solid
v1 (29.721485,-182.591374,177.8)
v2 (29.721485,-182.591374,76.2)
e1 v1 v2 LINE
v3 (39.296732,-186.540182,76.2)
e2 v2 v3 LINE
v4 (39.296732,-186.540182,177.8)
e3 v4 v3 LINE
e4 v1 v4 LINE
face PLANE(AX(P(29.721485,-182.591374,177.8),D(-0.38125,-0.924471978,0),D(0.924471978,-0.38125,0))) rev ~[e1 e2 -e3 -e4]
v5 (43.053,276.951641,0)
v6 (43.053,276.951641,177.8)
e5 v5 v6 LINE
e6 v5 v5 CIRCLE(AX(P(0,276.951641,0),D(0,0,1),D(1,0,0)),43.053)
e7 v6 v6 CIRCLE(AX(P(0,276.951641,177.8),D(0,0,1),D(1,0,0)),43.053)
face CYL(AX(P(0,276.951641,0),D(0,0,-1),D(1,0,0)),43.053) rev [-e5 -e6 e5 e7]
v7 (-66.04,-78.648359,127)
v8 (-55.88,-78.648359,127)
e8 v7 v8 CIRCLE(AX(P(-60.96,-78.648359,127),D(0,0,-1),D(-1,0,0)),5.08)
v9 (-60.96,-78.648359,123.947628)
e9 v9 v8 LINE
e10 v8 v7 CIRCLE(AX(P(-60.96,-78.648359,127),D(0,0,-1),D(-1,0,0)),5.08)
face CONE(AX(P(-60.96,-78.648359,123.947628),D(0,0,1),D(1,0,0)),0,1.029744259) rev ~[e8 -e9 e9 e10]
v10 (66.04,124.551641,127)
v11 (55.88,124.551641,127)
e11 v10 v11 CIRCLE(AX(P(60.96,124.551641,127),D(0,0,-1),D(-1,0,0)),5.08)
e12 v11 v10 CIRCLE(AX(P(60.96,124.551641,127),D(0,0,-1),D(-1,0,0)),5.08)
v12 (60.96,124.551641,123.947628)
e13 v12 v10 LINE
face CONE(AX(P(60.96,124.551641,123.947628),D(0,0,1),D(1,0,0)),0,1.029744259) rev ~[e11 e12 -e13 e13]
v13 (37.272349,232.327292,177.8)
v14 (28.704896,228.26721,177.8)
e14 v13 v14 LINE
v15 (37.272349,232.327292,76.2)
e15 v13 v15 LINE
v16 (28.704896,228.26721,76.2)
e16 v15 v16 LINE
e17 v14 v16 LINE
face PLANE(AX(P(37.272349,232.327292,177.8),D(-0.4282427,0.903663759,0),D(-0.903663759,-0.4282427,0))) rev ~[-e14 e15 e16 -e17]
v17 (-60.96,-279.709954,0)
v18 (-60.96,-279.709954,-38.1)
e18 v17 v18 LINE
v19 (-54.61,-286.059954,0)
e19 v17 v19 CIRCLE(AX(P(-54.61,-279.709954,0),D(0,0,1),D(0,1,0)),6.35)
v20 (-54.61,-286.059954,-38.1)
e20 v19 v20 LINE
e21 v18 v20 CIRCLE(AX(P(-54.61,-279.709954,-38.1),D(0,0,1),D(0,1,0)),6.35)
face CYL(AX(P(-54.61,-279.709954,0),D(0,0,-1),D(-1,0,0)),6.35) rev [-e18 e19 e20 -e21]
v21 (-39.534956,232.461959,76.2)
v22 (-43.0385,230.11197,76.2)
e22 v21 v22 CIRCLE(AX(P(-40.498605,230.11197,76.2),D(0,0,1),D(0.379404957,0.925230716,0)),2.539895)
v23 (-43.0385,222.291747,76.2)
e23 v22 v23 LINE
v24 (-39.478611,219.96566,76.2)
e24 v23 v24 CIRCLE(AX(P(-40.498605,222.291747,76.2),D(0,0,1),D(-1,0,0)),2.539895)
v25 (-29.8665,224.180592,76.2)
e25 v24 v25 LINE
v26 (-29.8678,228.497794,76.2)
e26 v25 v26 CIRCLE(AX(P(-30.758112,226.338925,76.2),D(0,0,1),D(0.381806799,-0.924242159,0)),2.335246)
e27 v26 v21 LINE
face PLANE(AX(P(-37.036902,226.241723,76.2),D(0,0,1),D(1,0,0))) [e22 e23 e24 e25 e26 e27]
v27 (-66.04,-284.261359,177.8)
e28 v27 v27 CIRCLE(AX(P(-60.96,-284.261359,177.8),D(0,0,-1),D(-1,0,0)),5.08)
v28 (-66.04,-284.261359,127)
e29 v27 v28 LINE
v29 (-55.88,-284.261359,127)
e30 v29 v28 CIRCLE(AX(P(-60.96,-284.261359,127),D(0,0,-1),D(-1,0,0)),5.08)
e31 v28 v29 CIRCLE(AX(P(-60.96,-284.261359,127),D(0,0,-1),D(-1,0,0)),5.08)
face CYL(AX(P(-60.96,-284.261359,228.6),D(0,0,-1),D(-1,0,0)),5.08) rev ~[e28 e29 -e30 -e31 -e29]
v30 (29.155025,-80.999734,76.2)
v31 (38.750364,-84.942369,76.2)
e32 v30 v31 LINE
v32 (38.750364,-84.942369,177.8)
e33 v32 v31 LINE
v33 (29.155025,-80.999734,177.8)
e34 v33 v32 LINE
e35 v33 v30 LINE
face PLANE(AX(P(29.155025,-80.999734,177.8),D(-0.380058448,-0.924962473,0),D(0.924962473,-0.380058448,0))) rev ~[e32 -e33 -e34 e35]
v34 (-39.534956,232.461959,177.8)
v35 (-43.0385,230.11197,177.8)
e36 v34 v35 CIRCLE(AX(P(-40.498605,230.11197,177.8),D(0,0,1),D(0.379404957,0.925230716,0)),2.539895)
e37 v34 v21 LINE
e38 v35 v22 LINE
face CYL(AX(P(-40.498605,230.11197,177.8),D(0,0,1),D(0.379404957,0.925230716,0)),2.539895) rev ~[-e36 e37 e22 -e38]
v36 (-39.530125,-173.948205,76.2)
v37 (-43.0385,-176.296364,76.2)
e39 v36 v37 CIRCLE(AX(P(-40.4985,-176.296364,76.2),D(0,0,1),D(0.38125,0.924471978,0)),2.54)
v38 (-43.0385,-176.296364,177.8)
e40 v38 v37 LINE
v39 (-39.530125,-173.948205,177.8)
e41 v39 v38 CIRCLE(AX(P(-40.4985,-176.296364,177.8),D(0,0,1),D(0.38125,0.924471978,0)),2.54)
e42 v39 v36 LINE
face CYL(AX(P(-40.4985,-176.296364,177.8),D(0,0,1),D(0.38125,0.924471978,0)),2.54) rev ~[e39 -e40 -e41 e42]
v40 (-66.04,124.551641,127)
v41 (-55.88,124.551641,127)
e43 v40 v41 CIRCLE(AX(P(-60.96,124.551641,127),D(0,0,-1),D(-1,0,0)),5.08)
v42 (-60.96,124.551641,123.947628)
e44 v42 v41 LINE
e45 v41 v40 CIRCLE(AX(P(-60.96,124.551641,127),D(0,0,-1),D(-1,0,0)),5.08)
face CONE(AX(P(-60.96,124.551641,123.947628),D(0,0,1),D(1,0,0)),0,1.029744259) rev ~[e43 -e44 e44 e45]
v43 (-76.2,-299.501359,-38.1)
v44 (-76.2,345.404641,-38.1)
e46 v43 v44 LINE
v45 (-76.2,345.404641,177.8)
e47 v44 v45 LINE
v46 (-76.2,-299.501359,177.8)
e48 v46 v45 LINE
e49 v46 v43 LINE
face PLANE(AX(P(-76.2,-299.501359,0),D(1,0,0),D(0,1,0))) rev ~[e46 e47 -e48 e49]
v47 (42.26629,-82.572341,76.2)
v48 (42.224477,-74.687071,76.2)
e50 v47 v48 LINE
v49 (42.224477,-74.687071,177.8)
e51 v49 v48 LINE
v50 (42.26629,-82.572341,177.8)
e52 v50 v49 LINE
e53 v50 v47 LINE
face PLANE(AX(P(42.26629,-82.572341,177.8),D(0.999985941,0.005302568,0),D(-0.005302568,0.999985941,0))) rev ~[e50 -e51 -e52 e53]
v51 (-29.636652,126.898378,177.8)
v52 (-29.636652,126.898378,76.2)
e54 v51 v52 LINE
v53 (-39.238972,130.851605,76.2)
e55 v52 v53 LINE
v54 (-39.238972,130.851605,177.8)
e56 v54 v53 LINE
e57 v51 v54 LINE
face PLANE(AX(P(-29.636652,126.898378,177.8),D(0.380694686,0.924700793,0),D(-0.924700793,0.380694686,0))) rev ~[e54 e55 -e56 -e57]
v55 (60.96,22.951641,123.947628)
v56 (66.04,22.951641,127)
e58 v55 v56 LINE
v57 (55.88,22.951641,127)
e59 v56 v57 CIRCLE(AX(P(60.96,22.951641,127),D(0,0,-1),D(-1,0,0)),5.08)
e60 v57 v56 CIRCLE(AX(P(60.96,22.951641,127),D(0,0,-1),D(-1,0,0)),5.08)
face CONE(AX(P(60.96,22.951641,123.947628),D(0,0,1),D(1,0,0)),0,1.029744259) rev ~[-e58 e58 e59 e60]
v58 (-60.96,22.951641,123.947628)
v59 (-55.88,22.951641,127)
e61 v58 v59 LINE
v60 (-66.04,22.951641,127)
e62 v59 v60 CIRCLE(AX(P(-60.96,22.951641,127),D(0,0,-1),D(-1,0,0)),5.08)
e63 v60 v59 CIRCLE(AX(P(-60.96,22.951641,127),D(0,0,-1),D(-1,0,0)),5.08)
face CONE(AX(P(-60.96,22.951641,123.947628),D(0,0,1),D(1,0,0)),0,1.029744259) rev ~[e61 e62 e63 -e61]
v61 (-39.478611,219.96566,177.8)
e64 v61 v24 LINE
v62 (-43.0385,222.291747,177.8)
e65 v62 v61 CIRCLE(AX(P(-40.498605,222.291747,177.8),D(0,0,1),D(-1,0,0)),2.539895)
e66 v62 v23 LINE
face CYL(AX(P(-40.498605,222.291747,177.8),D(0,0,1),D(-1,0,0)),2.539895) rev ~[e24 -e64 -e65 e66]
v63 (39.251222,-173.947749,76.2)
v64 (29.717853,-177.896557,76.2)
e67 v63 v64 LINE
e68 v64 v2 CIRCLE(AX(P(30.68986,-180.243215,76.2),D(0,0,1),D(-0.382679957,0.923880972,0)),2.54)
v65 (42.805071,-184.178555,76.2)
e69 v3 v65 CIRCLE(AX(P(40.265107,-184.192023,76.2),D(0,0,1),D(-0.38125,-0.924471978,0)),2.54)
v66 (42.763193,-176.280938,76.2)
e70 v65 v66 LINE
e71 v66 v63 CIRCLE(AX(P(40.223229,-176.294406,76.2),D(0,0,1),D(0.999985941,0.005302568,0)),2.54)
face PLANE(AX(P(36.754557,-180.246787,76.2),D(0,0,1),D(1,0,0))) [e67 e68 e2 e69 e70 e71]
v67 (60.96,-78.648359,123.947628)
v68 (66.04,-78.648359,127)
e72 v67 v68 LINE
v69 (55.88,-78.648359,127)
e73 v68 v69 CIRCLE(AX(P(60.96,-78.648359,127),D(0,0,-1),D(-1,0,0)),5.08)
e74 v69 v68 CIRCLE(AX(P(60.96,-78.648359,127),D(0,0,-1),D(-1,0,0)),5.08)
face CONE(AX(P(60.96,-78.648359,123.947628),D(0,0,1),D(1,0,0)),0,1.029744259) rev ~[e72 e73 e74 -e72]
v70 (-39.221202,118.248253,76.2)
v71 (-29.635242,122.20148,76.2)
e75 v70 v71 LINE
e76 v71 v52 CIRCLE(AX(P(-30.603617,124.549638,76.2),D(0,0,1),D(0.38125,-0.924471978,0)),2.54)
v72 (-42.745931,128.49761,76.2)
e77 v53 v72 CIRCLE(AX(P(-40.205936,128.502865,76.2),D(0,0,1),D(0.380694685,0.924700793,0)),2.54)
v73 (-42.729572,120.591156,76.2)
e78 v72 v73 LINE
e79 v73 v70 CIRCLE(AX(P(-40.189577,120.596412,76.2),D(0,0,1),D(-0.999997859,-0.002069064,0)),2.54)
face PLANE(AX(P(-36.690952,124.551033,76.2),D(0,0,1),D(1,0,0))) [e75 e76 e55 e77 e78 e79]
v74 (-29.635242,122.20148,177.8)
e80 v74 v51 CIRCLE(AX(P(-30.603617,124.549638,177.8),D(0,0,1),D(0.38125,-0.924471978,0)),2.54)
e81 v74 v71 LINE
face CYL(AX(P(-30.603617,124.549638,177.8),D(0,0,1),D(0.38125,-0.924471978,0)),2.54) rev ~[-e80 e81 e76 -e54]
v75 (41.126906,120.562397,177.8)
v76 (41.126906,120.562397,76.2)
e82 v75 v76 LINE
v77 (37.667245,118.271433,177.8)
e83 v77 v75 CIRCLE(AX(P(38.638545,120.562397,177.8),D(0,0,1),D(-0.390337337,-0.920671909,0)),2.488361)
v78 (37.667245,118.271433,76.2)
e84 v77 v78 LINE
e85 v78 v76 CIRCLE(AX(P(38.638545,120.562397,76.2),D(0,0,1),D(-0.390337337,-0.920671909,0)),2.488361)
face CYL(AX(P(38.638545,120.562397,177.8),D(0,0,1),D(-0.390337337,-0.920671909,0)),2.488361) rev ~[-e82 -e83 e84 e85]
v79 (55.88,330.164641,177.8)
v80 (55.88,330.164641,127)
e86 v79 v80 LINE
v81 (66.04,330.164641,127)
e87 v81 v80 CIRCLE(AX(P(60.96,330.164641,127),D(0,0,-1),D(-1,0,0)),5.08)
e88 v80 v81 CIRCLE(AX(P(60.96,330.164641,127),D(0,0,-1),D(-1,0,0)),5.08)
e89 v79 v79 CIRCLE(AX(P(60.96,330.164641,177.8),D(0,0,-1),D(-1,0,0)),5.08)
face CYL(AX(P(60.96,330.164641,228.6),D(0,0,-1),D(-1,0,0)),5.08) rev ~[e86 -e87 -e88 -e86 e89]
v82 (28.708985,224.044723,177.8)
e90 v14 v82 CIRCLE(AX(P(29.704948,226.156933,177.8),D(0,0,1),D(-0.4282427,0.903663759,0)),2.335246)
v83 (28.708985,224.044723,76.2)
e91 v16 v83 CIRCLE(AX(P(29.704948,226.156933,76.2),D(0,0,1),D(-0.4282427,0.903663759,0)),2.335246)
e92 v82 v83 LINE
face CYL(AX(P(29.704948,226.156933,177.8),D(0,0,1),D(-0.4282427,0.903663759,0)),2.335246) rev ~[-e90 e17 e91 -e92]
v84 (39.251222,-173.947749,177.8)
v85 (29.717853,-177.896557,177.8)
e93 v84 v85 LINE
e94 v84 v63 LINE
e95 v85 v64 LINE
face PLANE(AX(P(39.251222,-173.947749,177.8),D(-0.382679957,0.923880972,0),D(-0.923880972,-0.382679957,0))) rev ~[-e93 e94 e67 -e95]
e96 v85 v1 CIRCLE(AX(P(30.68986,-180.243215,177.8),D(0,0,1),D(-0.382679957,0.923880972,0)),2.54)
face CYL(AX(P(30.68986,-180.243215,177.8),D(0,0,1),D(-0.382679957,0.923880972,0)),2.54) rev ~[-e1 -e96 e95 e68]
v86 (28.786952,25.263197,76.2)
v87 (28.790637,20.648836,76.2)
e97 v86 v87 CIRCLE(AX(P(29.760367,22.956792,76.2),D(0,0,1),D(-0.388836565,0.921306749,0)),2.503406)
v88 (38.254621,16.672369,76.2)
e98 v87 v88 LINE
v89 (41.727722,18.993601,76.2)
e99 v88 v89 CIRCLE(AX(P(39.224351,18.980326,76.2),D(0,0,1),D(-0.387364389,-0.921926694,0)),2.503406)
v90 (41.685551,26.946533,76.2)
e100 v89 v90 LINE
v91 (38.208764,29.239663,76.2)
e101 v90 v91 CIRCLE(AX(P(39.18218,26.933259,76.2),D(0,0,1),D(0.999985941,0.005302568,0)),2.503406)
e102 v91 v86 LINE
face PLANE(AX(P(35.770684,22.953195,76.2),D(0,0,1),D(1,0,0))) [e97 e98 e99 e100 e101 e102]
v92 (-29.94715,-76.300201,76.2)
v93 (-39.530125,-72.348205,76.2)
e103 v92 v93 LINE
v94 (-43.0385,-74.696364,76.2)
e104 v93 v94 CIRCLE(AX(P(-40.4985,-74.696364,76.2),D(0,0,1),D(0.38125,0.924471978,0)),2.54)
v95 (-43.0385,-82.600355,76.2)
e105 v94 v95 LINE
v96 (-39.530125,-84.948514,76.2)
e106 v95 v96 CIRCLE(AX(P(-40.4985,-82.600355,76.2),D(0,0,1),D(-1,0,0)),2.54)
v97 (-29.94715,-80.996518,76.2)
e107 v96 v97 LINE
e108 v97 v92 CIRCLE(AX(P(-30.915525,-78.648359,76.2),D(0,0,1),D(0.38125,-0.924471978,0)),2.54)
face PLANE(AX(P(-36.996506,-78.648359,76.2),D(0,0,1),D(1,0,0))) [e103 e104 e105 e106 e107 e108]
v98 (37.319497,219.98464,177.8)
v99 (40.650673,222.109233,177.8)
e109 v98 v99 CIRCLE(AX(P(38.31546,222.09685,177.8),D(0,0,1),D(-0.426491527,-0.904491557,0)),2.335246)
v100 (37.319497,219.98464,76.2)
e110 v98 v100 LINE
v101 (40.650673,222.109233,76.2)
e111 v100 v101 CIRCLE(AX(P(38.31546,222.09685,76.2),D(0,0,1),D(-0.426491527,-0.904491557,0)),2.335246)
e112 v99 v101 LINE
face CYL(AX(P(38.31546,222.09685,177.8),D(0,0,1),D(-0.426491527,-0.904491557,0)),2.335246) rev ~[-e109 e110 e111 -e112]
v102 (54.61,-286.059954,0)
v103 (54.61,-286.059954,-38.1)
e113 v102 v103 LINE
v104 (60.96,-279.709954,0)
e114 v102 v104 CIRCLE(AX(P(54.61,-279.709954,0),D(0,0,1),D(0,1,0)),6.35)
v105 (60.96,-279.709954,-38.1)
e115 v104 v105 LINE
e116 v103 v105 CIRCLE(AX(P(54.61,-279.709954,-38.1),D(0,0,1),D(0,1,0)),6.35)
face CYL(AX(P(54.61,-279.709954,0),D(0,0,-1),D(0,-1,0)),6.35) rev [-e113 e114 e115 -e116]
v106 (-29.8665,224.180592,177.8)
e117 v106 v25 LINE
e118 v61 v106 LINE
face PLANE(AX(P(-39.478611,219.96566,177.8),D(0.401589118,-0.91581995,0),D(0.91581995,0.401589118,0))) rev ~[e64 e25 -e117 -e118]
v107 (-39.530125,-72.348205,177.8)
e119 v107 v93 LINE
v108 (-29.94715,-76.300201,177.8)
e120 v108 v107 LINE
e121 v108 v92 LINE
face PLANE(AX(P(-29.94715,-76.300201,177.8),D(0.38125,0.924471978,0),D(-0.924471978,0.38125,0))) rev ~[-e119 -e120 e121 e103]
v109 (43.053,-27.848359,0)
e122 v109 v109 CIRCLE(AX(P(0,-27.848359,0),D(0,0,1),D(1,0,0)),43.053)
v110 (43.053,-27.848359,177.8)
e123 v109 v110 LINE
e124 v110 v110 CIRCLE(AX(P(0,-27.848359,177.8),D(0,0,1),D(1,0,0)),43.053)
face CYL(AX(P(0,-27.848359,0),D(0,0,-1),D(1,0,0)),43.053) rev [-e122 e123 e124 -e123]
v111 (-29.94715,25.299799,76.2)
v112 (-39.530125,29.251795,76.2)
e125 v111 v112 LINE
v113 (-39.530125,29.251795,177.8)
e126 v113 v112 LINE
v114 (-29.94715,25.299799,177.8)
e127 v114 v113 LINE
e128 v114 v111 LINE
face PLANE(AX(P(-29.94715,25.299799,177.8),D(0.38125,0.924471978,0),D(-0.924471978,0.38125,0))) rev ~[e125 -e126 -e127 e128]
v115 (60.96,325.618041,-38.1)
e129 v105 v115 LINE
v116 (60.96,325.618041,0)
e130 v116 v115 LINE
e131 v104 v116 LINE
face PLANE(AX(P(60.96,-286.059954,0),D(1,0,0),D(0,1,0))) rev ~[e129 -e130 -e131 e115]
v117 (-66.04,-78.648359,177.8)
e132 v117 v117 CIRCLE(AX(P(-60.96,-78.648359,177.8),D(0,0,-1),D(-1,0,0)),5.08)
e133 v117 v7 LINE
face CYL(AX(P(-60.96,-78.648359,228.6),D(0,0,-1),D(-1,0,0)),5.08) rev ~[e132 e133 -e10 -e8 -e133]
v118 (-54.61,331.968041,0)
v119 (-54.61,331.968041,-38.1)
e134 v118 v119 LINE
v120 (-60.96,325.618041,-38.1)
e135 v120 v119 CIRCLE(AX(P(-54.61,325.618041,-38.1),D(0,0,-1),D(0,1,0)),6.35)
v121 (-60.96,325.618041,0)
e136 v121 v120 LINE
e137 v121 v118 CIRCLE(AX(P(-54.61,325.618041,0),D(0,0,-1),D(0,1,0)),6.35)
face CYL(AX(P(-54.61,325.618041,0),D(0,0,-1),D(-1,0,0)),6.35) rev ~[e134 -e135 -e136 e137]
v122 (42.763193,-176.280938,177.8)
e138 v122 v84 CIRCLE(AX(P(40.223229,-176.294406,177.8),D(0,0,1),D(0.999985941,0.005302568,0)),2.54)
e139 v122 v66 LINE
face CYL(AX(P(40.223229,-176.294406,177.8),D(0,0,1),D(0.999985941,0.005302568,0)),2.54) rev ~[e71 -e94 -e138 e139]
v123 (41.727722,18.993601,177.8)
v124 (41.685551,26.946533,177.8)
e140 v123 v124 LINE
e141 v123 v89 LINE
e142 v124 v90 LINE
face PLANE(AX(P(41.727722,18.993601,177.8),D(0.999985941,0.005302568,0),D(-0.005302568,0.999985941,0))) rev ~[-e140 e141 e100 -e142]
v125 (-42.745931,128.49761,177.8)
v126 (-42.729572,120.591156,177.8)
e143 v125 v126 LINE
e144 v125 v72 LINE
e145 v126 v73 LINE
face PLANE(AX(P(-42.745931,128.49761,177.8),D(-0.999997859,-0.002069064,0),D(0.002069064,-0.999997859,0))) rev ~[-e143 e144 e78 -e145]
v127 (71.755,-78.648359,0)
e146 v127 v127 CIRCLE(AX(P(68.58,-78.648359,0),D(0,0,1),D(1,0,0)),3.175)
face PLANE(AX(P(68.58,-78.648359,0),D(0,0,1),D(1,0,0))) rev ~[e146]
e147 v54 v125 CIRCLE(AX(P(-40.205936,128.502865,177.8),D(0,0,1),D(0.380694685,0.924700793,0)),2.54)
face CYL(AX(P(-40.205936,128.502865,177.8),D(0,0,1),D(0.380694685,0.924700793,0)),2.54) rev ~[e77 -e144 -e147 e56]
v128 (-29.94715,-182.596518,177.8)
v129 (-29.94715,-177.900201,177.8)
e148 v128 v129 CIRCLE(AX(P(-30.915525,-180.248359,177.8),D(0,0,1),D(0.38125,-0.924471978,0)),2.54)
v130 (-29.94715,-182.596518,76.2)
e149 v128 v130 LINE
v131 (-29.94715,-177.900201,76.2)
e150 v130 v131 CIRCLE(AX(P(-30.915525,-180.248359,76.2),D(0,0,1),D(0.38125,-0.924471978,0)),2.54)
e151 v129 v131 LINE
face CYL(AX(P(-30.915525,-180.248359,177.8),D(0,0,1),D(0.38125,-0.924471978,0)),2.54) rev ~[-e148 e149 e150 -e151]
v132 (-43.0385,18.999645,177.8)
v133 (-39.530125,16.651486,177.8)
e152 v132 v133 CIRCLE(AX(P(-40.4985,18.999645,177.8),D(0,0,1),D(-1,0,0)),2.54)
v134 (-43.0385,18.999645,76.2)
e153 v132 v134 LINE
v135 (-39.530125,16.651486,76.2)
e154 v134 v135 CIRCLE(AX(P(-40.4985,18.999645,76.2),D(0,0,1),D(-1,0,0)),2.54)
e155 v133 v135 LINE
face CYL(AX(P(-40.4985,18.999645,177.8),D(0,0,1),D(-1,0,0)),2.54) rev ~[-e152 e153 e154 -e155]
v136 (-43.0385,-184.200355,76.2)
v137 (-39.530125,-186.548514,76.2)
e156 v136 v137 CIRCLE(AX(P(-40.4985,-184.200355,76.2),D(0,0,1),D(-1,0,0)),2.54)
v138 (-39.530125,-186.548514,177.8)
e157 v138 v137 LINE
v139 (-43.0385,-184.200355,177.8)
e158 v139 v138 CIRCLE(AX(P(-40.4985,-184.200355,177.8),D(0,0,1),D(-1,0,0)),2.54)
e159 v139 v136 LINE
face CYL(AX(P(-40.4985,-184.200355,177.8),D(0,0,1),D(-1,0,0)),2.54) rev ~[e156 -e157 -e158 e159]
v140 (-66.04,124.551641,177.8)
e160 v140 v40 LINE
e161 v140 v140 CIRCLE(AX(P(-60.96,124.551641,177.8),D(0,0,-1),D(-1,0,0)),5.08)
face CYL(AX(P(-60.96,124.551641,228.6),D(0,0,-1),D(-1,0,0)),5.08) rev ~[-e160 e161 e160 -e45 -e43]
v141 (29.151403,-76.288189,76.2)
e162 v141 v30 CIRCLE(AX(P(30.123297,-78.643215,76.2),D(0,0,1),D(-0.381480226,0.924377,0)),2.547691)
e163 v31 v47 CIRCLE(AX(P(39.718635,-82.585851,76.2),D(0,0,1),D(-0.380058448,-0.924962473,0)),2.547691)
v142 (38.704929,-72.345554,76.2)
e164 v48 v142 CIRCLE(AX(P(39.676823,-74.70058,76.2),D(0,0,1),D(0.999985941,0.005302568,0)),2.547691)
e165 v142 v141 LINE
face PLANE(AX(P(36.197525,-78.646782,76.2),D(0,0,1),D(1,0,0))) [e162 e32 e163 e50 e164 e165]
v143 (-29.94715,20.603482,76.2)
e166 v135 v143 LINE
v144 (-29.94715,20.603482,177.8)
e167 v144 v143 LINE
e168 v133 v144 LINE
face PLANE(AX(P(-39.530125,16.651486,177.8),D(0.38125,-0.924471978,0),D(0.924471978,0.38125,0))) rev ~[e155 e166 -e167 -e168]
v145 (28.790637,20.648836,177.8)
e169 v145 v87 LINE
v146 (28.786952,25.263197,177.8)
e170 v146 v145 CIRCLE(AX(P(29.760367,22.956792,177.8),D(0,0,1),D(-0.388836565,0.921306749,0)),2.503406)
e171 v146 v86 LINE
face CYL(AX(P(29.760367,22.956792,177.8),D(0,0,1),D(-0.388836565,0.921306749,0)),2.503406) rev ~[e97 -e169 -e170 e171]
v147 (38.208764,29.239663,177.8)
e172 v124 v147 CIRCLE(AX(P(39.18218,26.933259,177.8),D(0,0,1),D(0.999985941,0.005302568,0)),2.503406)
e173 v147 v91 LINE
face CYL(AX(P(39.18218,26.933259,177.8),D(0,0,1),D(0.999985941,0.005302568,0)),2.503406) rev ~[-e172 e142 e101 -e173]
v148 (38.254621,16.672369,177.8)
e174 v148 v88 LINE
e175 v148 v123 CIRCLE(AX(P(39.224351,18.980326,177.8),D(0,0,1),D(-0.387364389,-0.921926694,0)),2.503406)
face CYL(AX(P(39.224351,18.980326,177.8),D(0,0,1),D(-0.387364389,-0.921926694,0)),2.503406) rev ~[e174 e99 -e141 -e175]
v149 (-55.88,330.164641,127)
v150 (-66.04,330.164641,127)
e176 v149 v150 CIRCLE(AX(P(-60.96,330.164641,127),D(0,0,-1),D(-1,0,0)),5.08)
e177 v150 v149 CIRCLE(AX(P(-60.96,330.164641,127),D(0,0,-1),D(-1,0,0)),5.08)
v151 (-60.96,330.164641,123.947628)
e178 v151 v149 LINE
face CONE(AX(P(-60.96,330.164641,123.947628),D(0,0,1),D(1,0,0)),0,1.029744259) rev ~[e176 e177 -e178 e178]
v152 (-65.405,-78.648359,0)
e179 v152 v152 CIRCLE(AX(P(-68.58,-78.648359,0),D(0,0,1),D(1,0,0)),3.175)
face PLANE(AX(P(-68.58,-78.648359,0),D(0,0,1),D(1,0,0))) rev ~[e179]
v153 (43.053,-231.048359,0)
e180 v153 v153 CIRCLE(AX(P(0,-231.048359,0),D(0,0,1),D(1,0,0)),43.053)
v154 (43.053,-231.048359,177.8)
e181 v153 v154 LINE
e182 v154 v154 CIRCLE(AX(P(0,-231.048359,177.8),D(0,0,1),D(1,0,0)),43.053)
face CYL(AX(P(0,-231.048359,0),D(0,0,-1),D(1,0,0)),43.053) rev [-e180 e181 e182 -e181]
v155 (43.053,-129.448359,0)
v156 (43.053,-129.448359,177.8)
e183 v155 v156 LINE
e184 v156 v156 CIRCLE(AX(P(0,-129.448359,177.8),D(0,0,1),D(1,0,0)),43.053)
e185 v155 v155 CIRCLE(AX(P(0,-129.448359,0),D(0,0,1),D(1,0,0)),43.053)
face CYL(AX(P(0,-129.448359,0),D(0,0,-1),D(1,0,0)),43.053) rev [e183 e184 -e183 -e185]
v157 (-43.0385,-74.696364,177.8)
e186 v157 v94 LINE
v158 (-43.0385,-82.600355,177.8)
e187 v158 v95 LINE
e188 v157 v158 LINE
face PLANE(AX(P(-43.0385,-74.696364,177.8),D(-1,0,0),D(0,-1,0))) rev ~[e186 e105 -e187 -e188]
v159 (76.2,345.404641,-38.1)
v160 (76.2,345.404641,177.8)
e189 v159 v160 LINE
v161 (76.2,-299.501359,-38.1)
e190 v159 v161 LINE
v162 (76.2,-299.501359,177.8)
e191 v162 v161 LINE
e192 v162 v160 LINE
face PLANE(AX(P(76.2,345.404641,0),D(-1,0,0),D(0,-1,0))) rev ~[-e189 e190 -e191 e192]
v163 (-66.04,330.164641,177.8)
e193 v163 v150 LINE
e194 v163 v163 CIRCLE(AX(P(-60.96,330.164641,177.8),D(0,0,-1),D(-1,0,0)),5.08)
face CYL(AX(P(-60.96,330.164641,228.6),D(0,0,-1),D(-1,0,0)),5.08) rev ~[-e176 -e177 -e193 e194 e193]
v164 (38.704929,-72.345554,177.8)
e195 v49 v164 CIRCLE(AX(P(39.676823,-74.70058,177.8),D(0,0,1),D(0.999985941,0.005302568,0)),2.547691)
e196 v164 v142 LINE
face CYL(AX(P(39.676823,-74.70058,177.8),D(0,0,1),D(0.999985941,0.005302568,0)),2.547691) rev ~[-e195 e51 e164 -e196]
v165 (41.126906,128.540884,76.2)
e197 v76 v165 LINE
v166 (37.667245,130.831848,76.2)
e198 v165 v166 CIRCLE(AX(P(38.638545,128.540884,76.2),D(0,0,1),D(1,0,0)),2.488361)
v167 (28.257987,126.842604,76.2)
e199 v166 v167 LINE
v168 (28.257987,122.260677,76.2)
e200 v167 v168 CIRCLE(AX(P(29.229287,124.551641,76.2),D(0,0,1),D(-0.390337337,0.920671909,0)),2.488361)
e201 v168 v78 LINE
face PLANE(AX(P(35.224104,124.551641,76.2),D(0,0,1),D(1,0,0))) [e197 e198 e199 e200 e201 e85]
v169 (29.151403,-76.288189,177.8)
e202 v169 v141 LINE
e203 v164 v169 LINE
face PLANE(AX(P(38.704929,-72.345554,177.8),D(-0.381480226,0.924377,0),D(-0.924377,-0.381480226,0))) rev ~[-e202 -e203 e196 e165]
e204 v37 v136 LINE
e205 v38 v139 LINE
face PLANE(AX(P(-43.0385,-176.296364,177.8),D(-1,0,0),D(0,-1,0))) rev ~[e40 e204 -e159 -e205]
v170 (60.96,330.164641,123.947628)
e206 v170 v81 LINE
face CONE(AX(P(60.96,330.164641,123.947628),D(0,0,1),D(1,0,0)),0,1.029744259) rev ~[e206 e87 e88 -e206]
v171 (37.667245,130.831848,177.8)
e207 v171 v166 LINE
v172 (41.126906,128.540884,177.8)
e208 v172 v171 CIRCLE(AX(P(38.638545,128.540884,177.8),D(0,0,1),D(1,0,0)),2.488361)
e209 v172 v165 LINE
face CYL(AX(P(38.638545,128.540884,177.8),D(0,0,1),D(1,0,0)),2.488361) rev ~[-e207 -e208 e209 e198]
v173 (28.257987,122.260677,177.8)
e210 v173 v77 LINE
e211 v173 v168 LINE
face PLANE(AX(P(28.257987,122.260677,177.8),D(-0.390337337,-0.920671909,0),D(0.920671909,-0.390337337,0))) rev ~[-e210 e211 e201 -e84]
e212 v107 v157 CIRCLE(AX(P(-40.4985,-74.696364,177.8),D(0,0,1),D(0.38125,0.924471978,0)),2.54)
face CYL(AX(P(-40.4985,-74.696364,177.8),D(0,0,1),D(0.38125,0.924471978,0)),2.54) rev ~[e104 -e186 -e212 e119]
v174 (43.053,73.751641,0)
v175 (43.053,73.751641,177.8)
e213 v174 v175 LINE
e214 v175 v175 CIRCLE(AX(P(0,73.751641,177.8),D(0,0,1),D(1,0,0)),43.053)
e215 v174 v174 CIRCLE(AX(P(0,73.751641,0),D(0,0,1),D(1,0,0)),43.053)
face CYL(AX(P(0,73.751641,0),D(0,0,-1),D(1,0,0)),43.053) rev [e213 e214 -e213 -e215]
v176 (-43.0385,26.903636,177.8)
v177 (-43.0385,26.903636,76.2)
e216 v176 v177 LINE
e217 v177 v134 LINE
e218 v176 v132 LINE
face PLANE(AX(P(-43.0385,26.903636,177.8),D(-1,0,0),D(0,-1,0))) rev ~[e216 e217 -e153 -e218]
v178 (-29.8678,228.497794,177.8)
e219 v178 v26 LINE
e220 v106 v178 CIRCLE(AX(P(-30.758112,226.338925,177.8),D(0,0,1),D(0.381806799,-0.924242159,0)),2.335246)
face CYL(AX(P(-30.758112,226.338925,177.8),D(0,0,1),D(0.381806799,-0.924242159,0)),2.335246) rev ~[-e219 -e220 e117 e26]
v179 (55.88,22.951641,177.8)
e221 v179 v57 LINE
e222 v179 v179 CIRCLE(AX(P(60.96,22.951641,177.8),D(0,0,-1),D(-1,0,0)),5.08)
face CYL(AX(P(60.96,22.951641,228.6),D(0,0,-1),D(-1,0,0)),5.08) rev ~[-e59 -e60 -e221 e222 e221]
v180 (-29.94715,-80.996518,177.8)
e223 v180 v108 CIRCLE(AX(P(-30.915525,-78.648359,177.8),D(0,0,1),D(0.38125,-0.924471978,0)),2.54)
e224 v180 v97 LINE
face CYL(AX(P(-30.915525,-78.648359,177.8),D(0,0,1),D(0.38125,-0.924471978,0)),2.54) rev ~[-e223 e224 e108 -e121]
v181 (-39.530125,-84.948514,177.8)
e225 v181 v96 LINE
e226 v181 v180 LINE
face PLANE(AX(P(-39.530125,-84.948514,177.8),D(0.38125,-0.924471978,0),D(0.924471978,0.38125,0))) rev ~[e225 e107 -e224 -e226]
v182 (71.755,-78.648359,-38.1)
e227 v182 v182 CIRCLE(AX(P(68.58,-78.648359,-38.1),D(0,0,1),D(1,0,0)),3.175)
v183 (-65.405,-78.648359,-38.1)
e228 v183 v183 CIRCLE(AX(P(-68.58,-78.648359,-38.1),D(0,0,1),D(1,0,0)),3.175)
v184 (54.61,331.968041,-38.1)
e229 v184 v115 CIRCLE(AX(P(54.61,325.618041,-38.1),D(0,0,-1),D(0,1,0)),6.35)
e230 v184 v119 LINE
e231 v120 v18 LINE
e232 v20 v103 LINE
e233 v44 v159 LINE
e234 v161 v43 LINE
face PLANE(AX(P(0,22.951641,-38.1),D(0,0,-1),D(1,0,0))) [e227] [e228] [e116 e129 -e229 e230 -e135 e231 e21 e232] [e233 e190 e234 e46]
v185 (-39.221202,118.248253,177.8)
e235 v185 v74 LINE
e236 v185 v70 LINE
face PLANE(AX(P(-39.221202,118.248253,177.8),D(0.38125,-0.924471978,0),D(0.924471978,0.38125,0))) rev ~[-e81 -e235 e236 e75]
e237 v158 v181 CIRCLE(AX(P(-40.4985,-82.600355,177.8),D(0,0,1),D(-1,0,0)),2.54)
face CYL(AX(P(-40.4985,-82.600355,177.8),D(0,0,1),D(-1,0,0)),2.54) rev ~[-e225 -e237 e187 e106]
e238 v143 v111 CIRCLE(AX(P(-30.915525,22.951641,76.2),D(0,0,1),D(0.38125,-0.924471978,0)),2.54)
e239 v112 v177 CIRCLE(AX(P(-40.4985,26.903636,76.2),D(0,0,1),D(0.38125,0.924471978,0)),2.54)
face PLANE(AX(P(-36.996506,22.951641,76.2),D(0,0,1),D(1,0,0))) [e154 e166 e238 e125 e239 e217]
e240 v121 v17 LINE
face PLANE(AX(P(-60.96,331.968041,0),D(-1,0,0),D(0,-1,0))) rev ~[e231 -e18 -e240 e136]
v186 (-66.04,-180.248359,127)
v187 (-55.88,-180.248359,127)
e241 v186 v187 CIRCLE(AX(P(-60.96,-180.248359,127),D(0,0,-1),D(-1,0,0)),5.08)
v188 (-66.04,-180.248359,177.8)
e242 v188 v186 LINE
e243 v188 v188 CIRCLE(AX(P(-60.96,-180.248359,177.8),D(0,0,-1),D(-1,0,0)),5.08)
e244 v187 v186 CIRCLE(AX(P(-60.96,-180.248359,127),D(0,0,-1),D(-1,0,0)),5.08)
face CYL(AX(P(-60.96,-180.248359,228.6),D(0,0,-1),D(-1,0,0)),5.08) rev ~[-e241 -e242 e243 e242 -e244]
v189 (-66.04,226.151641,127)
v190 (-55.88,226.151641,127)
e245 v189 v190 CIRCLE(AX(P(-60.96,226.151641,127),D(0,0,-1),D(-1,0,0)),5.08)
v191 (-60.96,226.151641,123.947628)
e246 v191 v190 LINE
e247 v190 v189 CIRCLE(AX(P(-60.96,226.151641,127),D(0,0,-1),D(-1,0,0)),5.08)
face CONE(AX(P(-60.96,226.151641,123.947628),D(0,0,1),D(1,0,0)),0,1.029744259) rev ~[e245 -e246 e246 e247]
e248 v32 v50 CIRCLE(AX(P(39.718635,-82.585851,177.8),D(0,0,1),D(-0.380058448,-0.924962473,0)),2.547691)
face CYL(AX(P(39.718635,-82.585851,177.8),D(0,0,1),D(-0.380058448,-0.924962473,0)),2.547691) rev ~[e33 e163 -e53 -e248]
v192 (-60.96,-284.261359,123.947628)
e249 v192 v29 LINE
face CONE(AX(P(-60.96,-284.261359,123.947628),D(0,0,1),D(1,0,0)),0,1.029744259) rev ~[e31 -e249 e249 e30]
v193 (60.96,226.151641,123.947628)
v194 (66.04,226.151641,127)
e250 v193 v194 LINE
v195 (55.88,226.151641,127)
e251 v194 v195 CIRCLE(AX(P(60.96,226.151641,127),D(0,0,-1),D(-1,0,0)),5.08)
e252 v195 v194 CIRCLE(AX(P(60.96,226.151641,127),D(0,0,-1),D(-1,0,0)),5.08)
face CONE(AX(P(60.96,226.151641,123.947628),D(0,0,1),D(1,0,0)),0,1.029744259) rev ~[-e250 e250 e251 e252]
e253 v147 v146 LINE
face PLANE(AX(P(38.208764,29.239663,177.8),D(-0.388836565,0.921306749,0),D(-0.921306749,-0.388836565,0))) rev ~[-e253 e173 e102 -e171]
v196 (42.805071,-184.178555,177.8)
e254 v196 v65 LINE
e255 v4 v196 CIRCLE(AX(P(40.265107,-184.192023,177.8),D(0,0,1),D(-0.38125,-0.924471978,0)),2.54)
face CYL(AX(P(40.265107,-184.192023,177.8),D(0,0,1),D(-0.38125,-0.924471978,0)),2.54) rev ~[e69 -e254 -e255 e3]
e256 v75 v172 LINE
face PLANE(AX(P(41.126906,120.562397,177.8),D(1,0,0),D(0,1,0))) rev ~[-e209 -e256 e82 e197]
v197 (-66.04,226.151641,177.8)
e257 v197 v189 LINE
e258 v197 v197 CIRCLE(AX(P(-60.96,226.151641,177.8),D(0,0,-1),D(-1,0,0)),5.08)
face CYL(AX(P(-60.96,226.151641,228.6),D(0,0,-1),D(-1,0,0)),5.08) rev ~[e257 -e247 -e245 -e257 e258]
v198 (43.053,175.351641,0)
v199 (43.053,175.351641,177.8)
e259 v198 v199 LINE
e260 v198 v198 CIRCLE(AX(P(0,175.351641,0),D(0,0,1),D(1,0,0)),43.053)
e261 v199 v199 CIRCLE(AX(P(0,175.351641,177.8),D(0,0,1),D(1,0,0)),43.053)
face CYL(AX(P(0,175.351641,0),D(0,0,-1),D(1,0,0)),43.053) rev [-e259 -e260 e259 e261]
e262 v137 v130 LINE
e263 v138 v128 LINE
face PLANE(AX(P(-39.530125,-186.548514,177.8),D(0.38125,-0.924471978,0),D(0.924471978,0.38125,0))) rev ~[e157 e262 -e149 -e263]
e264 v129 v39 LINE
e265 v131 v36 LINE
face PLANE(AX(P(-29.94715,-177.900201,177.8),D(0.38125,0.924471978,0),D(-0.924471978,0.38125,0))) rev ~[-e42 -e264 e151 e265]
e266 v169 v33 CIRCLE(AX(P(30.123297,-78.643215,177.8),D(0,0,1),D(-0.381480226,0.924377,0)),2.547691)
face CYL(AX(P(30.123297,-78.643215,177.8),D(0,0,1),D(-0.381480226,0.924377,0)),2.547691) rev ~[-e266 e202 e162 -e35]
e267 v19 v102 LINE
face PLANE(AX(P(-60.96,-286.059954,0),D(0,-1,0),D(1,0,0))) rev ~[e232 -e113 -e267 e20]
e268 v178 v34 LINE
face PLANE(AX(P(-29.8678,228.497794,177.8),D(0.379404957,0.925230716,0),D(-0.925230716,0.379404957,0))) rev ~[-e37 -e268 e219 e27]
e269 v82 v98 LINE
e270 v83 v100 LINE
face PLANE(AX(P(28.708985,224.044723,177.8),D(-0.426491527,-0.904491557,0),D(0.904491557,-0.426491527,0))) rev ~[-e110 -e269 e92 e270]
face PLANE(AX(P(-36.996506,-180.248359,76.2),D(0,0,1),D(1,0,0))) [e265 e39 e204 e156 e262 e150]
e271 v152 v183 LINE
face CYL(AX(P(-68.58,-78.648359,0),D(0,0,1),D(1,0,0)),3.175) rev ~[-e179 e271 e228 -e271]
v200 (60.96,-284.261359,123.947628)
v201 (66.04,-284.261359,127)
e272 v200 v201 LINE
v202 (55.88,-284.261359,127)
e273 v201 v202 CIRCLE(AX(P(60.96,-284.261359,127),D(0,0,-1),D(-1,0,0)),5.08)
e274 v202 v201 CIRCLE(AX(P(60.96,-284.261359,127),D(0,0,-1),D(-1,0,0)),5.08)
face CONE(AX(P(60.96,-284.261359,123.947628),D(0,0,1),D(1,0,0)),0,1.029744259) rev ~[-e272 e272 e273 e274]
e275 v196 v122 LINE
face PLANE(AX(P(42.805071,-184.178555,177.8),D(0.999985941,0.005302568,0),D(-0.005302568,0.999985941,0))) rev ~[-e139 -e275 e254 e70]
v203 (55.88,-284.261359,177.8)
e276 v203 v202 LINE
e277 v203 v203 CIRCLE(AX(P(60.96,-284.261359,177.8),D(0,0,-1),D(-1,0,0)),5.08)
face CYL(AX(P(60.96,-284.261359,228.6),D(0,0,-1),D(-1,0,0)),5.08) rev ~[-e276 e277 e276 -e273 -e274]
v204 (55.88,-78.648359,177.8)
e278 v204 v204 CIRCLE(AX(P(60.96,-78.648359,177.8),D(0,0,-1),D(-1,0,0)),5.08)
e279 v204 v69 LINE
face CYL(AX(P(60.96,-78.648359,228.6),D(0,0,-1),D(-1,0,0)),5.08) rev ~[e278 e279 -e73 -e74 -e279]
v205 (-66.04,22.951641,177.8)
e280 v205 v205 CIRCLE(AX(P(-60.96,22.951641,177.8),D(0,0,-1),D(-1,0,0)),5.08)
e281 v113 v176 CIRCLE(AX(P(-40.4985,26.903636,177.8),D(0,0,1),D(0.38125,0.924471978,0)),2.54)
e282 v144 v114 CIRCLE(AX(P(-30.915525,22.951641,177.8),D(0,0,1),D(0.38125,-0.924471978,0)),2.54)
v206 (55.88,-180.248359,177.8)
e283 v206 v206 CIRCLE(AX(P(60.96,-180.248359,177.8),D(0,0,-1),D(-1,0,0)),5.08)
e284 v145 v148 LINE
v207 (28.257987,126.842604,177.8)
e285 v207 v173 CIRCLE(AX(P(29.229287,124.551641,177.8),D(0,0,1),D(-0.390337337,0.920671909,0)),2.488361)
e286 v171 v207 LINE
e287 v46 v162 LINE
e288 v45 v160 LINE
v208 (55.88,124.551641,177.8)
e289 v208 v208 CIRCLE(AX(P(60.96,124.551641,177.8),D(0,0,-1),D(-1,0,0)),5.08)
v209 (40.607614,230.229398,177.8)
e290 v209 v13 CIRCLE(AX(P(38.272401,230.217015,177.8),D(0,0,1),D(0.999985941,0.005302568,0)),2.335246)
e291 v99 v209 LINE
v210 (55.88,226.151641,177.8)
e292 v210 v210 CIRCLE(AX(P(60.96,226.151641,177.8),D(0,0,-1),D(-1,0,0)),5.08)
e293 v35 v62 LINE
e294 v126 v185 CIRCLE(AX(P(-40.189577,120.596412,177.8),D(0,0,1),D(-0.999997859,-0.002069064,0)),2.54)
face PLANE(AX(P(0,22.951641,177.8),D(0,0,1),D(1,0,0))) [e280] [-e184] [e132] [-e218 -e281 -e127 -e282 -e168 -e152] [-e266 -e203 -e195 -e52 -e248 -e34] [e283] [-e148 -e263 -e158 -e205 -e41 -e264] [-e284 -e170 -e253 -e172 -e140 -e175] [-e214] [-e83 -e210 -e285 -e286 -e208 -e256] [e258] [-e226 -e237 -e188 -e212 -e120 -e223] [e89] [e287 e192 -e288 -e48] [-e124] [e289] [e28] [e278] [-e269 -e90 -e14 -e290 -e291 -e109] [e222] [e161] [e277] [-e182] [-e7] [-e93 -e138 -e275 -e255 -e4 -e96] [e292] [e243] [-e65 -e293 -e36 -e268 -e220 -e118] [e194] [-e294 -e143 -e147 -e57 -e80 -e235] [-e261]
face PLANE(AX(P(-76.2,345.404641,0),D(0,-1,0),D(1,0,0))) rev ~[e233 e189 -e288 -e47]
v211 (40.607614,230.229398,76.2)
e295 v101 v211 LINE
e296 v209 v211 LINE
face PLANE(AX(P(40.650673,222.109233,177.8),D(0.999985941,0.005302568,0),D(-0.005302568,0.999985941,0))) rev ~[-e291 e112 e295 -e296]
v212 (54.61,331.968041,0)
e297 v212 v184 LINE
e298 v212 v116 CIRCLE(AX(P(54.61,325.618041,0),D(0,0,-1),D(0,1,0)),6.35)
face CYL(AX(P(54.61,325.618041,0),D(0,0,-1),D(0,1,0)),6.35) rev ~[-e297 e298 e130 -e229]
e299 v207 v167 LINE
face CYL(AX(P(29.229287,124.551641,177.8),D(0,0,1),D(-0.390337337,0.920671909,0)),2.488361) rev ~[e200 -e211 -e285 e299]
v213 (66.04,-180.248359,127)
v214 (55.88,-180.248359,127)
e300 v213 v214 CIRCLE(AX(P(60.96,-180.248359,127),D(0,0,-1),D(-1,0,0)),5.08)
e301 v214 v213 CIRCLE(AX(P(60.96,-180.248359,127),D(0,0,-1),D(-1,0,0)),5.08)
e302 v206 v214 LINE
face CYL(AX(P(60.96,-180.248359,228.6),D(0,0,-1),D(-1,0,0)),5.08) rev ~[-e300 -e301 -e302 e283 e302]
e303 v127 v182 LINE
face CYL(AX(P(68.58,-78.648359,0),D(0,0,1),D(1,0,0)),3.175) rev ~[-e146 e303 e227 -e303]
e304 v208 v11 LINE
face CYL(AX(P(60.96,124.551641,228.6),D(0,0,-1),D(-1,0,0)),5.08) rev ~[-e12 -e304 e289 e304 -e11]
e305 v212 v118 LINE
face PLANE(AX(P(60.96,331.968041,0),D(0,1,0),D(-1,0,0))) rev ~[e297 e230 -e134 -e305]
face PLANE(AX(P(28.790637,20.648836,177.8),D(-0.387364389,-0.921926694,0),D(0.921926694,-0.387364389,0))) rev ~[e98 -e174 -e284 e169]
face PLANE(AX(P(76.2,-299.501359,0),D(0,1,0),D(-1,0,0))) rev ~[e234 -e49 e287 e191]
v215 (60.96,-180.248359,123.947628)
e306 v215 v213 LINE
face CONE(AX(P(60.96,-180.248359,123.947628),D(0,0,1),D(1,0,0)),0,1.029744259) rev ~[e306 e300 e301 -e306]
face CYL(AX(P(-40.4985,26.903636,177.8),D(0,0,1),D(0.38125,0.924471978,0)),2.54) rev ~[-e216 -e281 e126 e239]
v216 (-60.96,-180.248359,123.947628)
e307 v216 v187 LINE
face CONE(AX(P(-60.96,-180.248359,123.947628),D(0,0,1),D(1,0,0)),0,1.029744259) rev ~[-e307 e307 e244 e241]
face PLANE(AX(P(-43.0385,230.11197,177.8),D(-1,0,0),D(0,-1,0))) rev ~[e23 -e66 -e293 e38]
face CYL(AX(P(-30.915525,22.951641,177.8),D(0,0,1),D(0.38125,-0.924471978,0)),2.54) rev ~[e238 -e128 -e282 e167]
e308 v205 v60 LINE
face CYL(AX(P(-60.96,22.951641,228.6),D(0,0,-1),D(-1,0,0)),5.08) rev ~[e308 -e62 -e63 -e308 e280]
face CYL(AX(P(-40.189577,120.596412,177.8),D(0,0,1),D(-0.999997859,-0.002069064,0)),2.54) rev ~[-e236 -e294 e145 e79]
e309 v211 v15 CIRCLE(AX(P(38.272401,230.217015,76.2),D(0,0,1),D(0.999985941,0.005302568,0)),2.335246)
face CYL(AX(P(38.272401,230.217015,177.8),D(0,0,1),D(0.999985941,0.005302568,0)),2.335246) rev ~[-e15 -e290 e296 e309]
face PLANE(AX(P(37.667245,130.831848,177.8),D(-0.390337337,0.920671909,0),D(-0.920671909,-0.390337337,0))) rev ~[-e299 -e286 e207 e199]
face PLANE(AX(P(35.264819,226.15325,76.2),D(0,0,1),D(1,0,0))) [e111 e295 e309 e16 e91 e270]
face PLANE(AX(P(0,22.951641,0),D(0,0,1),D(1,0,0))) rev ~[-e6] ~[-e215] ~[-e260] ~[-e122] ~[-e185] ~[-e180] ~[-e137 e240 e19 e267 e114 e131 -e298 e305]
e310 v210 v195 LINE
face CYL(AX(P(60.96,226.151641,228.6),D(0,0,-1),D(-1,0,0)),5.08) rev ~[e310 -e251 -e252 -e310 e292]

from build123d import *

# Parameters (mm, degrees)
F0_W     = 152.4
F0_H     = 644.906
F0_R     = 43.053
F1_DEPTH = 177.8
F3_D     = 10.16
F3_DEPTH = 50.8
F3_TIP   = 3.0523719447
F5_DEPTH = 101.6
F8_DEPTH = 38.1
F9_D     = 6.35
F9_DEPTH = 38.1
F9_TIP   = 1.9077324654
F10_R    = 6.35


# Not quite as in the source:
# - a feature names something its author has since deleted; it is built from what else it names


with BuildPart() as f1:
    # F0 (on Top) → F1 (new body)
    with BuildSketch(Plane.XY):
        with Locations((0, 22.9516405373)):
            Rectangle(F0_W, F0_H)
        with Locations((0, -231.0483594627)):
            Circle(F0_R, mode=Mode.SUBTRACT)
        with Locations((0, -129.4483594627)):
            Circle(F0_R, mode=Mode.SUBTRACT)
        with Locations((0, -27.8483594627)):
            Circle(F0_R, mode=Mode.SUBTRACT)
        with Locations((0, 73.7516405373)):
            Circle(F0_R, mode=Mode.SUBTRACT)
        with Locations((0, 175.3516405373)):
            Circle(F0_R, mode=Mode.SUBTRACT)
        with Locations((0, 276.9516405373)):
            Circle(F0_R, mode=Mode.SUBTRACT)
    extrude(amount=F1_DEPTH)

    # F3
    with Locations(Plane.XY.offset(177.8)):
        with Locations((-60.96, -284.2613594627), (60.96, -284.2613594627), (-60.96, -180.2483594627), (60.96, -180.2483594627), (-60.96, -78.6483594627), (60.96, -78.6483594627), (-60.96, 22.9516405373), (60.96, 22.9516405373), (-60.96, 124.5516405373), (60.96, 124.5516405373), (-60.96, 226.1516405373), (60.96, 226.1516405373), (-60.96, 330.1646405373), (60.96, 330.1646405373)):
            Hole(F3_D / 2, depth=F3_DEPTH)
            with Locations((0, 0, -(F3_DEPTH + F3_TIP / 2))):  # 118° drill point
                Cone(0, F3_D / 2, F3_TIP, mode=Mode.SUBTRACT)

    # F4 (on face) → F5 (cut)
    with BuildSketch(Plane.XY.offset(177.8)):
        with BuildLine():
            ThreePointArc((-39.5301250083, -173.9482047983), (-41.9112858201, -174.185525814), (-43.0385000083, -176.2963636216))
            Line((-43.0385000083, -176.2963636216), (-43.0385000083, -184.2003553039))
            ThreePointArc((-43.0385000083, -184.2003553039), (-41.9112858201, -186.3111931115), (-39.5301250083, -186.5485141272))
            Line((-39.5301250083, -186.5485141272), (-29.947149504, -182.596518286))
            ThreePointArc((-29.947149504, -182.596518286), (-28.375524504, -180.2483594627), (-29.947149504, -177.9002006395))
            Line((-29.947149504, -177.9002006395), (-39.5301250083, -173.9482047983))
        make_face()
        with BuildLine():
            Line((42.8050714591, -184.1785549312), (42.7631932188, -176.2809378323))
            ThreePointArc((42.7631932188, -176.2809378323), (41.6287769855, -174.1787422376), (39.2512218362, -173.9477486864))
            Line((39.2512218362, -173.9477486864), (29.7178532592, -177.8965572358))
            ThreePointArc((29.7178532592, -177.8965572358), (28.149861111, -180.2451799461), (29.7214853508, -182.5913737277))
            Line((29.7214853508, -182.5913737277), (39.2967321682, -186.5401822772))
            ThreePointArc((39.2967321682, -186.5401822772), (41.6834844647, -186.299108133), (42.8050714591, -184.1785549312))
        make_face()
        with BuildLine():
            ThreePointArc((-39.5301250083, -72.3482047983), (-41.9112858201, -72.585525814), (-43.0385000083, -74.6963636216))
            Line((-43.0385000083, -74.6963636216), (-43.0385000083, -82.6003553039))
            ThreePointArc((-43.0385000083, -82.6003553039), (-41.9112858201, -84.7111931115), (-39.5301250083, -84.9485141272))
            Line((-39.5301250083, -84.9485141272), (-29.947149504, -80.996518286))
            ThreePointArc((-29.947149504, -80.996518286), (-28.375524504, -78.6483594627), (-29.947149504, -76.3002006395))
            Line((-29.947149504, -76.3002006395), (-39.5301250083, -72.3482047983))
        make_face()
        with BuildLine():
            Line((42.2662900285, -82.5723412323), (42.2244772598, -74.6870711239))
            ThreePointArc((42.2244772598, -74.6870711239), (41.0880034509, -72.579426147), (38.7049289993, -72.3455539051))
            Line((38.7049289993, -72.3455539051), (29.1514032422, -76.2881889593))
            ThreePointArc((29.1514032422, -76.2881889593), (27.5756070282, -78.6451741517), (29.1550254915, -80.9997336057))
            Line((29.1550254915, -80.9997336057), (38.7503640173, -84.9423686599))
            ThreePointArc((38.7503640173, -84.9423686599), (41.1426684979, -84.6983979341), (42.2662900285, -82.5723412323))
        make_face()
        with BuildLine():
            ThreePointArc((-39.5301250083, 29.2517952017), (-41.9112858201, 29.014474186), (-43.0385000083, 26.9036363784))
            Line((-43.0385000083, 26.9036363784), (-43.0385000083, 18.9996446961))
            ThreePointArc((-43.0385000083, 18.9996446961), (-41.9112858201, 16.8888068885), (-39.5301250083, 16.6514858728))
            Line((-39.5301250083, 16.6514858728), (-29.947149504, 20.603481714))
            ThreePointArc((-29.947149504, 20.603481714), (-28.375524504, 22.9516405373), (-29.947149504, 25.2997993605))
            Line((-29.947149504, 25.2997993605), (-39.5301250083, 29.2517952017))
        make_face()
        with BuildLine():
            Line((41.7277221449, 18.9936006532), (41.6855505867, 26.946533154))
            ThreePointArc((41.6855505867, 26.946533154), (40.5605129606, 29.0230527195), (38.2087640486, 29.2396634781))
            Line((38.2087640486, 29.2396634781), (28.7869515979, 25.2631972277))
            ThreePointArc((28.7869515979, 25.2631972277), (27.2569622126, 22.9547929732), (28.7906370523, 20.6488356434))
            Line((28.7906370523, 20.6488356434), (38.2546210612, 16.672369393))
            ThreePointArc((38.2546210612, 16.672369393), (40.6154092138, 16.8989805748), (41.7277221449, 18.9936006532))
        make_face()
        with BuildLine():
            ThreePointArc((-39.2389715781, 130.8516052404), (-41.6215382557, 130.6118153154), (-42.7459306424, 128.4976098044))
            Line((-42.7459306424, 128.4976098044), (-42.7295716504, 120.5911560789))
            ThreePointArc((-42.7295716504, 120.5911560789), (-41.6001784129, 118.4841132501), (-39.2212020873, 118.2482526776))
            Line((-39.2212020873, 118.2482526776), (-29.635241547, 122.2014795403))
            ThreePointArc((-29.635241547, 122.2014795403), (-28.0636166616, 124.5504011364), (-29.6366520458, 126.8983783776))
            Line((-29.6366520458, 126.8983783776), (-39.2389715781, 130.8516052404))
        make_face()
        with BuildLine():
            Line((41.1269060209, 120.5623967021), (41.1269060209, 128.5408843724))
            ThreePointArc((41.1269060209, 128.5408843724), (40.0124074762, 130.6155991372), (37.6672454799, 130.8318480041))
            Line((37.6672454799, 130.8318480041), (28.2579874063, 126.8426041689))
            ThreePointArc((28.2579874063, 126.8426041689), (26.740926903, 124.5516405373), (28.2579874063, 122.2606769056))
            Line((28.2579874063, 122.2606769056), (37.6672454799, 118.2714330704))
            ThreePointArc((37.6672454799, 118.2714330704), (40.0124074762, 118.4876819373), (41.1269060209, 120.5623967021))
        make_face()
        with BuildLine():
            Line((-39.4786105583, 219.9656601087), (-29.866499751, 224.1805924273))
            ThreePointArc((-29.866499751, 224.1805924273), (-28.4228668084, 226.3396283374), (-29.8678000125, 228.4977942646))
            Line((-29.8678000125, 228.4977942646), (-39.5349560025, 232.4619589189))
            ThreePointArc((-39.5349560025, 232.4619589189), (-41.9134370658, 232.2213103618), (-43.0385000083, 230.1119698791))
            Line((-43.0385000083, 230.1119698791), (-43.0385000083, 222.2917467873))
            ThreePointArc((-43.0385000083, 222.2917467873), (-41.8879192273, 220.1655123145), (-39.4786105583, 219.9656601087))
        make_face()
        with BuildLine():
            Line((40.650672554, 222.1092328525), (40.6076142213, 230.2293979276))
            ThreePointArc((40.6076142213, 230.2293979276), (39.515765156, 232.1937343917), (37.2723493523, 232.3272920851))
            Line((37.2723493523, 232.3272920851), (28.7048957748, 228.2672095476))
            ThreePointArc((28.7048957748, 228.2672095476), (27.3697030623, 226.15467094), (28.7089851923, 224.0447225226))
            Line((28.7089851923, 224.0447225226), (37.3194971026, 219.9846399851))
            ThreePointArc((37.3194971026, 219.9846399851), (39.5711951198, 220.1279668388), (40.650672554, 222.1092328525))
        make_face()
    extrude(amount=-F5_DEPTH, mode=Mode.SUBTRACT)

    # F7 (on face) → F8 (join)
    with BuildSketch(Plane(origin=(0, 0, 0), x_dir=(1, 0, 0), z_dir=(0, 0, -1))):
        Polygon((76.2, -345.4046405373), (76.2, 299.4986176491), (76.2, 299.5013594627), (-76.2, 299.5013594627), (-76.2, -345.4046405373), align=None)
        Polygon((-60.96, -321.8358690433), (-60.96, 286.0599543583), (60.96, 286.0599543583), (60.96, -331.9680405373), (-60.96, -331.9680405373), align=None, mode=Mode.SUBTRACT)
    extrude(amount=F8_DEPTH)

    # F9 (one way)
    with BuildSketch(Plane.XY):
        with Locations((-68.58, -78.6483594627), (68.58, -78.6483594627)):
            Circle(F9_D / 2)
    extrude(amount=-F9_DEPTH, mode=Mode.SUBTRACT)
    with Locations(Plane.XY):
        with Locations((-68.58, -78.6483594627), (68.58, -78.6483594627)):
            with Locations((0, 0, -(F9_DEPTH + F9_TIP / 2))):  # 118° drill point
                Cone(0, F9_D / 2, F9_TIP, mode=Mode.SUBTRACT)

    # F10
    f10_edges = [f1.edges().sort_by_distance(p)[0] for p in [
        (60.96, -286.059954, -19.05),
        (-60.96, -286.059954, -19.05),
        (60.96, 331.968041, -19.05),
        (-60.96, 331.968041, -19.05),
    ]]
    fillet(f10_edges, radius=F10_R)


solid = f1.part
